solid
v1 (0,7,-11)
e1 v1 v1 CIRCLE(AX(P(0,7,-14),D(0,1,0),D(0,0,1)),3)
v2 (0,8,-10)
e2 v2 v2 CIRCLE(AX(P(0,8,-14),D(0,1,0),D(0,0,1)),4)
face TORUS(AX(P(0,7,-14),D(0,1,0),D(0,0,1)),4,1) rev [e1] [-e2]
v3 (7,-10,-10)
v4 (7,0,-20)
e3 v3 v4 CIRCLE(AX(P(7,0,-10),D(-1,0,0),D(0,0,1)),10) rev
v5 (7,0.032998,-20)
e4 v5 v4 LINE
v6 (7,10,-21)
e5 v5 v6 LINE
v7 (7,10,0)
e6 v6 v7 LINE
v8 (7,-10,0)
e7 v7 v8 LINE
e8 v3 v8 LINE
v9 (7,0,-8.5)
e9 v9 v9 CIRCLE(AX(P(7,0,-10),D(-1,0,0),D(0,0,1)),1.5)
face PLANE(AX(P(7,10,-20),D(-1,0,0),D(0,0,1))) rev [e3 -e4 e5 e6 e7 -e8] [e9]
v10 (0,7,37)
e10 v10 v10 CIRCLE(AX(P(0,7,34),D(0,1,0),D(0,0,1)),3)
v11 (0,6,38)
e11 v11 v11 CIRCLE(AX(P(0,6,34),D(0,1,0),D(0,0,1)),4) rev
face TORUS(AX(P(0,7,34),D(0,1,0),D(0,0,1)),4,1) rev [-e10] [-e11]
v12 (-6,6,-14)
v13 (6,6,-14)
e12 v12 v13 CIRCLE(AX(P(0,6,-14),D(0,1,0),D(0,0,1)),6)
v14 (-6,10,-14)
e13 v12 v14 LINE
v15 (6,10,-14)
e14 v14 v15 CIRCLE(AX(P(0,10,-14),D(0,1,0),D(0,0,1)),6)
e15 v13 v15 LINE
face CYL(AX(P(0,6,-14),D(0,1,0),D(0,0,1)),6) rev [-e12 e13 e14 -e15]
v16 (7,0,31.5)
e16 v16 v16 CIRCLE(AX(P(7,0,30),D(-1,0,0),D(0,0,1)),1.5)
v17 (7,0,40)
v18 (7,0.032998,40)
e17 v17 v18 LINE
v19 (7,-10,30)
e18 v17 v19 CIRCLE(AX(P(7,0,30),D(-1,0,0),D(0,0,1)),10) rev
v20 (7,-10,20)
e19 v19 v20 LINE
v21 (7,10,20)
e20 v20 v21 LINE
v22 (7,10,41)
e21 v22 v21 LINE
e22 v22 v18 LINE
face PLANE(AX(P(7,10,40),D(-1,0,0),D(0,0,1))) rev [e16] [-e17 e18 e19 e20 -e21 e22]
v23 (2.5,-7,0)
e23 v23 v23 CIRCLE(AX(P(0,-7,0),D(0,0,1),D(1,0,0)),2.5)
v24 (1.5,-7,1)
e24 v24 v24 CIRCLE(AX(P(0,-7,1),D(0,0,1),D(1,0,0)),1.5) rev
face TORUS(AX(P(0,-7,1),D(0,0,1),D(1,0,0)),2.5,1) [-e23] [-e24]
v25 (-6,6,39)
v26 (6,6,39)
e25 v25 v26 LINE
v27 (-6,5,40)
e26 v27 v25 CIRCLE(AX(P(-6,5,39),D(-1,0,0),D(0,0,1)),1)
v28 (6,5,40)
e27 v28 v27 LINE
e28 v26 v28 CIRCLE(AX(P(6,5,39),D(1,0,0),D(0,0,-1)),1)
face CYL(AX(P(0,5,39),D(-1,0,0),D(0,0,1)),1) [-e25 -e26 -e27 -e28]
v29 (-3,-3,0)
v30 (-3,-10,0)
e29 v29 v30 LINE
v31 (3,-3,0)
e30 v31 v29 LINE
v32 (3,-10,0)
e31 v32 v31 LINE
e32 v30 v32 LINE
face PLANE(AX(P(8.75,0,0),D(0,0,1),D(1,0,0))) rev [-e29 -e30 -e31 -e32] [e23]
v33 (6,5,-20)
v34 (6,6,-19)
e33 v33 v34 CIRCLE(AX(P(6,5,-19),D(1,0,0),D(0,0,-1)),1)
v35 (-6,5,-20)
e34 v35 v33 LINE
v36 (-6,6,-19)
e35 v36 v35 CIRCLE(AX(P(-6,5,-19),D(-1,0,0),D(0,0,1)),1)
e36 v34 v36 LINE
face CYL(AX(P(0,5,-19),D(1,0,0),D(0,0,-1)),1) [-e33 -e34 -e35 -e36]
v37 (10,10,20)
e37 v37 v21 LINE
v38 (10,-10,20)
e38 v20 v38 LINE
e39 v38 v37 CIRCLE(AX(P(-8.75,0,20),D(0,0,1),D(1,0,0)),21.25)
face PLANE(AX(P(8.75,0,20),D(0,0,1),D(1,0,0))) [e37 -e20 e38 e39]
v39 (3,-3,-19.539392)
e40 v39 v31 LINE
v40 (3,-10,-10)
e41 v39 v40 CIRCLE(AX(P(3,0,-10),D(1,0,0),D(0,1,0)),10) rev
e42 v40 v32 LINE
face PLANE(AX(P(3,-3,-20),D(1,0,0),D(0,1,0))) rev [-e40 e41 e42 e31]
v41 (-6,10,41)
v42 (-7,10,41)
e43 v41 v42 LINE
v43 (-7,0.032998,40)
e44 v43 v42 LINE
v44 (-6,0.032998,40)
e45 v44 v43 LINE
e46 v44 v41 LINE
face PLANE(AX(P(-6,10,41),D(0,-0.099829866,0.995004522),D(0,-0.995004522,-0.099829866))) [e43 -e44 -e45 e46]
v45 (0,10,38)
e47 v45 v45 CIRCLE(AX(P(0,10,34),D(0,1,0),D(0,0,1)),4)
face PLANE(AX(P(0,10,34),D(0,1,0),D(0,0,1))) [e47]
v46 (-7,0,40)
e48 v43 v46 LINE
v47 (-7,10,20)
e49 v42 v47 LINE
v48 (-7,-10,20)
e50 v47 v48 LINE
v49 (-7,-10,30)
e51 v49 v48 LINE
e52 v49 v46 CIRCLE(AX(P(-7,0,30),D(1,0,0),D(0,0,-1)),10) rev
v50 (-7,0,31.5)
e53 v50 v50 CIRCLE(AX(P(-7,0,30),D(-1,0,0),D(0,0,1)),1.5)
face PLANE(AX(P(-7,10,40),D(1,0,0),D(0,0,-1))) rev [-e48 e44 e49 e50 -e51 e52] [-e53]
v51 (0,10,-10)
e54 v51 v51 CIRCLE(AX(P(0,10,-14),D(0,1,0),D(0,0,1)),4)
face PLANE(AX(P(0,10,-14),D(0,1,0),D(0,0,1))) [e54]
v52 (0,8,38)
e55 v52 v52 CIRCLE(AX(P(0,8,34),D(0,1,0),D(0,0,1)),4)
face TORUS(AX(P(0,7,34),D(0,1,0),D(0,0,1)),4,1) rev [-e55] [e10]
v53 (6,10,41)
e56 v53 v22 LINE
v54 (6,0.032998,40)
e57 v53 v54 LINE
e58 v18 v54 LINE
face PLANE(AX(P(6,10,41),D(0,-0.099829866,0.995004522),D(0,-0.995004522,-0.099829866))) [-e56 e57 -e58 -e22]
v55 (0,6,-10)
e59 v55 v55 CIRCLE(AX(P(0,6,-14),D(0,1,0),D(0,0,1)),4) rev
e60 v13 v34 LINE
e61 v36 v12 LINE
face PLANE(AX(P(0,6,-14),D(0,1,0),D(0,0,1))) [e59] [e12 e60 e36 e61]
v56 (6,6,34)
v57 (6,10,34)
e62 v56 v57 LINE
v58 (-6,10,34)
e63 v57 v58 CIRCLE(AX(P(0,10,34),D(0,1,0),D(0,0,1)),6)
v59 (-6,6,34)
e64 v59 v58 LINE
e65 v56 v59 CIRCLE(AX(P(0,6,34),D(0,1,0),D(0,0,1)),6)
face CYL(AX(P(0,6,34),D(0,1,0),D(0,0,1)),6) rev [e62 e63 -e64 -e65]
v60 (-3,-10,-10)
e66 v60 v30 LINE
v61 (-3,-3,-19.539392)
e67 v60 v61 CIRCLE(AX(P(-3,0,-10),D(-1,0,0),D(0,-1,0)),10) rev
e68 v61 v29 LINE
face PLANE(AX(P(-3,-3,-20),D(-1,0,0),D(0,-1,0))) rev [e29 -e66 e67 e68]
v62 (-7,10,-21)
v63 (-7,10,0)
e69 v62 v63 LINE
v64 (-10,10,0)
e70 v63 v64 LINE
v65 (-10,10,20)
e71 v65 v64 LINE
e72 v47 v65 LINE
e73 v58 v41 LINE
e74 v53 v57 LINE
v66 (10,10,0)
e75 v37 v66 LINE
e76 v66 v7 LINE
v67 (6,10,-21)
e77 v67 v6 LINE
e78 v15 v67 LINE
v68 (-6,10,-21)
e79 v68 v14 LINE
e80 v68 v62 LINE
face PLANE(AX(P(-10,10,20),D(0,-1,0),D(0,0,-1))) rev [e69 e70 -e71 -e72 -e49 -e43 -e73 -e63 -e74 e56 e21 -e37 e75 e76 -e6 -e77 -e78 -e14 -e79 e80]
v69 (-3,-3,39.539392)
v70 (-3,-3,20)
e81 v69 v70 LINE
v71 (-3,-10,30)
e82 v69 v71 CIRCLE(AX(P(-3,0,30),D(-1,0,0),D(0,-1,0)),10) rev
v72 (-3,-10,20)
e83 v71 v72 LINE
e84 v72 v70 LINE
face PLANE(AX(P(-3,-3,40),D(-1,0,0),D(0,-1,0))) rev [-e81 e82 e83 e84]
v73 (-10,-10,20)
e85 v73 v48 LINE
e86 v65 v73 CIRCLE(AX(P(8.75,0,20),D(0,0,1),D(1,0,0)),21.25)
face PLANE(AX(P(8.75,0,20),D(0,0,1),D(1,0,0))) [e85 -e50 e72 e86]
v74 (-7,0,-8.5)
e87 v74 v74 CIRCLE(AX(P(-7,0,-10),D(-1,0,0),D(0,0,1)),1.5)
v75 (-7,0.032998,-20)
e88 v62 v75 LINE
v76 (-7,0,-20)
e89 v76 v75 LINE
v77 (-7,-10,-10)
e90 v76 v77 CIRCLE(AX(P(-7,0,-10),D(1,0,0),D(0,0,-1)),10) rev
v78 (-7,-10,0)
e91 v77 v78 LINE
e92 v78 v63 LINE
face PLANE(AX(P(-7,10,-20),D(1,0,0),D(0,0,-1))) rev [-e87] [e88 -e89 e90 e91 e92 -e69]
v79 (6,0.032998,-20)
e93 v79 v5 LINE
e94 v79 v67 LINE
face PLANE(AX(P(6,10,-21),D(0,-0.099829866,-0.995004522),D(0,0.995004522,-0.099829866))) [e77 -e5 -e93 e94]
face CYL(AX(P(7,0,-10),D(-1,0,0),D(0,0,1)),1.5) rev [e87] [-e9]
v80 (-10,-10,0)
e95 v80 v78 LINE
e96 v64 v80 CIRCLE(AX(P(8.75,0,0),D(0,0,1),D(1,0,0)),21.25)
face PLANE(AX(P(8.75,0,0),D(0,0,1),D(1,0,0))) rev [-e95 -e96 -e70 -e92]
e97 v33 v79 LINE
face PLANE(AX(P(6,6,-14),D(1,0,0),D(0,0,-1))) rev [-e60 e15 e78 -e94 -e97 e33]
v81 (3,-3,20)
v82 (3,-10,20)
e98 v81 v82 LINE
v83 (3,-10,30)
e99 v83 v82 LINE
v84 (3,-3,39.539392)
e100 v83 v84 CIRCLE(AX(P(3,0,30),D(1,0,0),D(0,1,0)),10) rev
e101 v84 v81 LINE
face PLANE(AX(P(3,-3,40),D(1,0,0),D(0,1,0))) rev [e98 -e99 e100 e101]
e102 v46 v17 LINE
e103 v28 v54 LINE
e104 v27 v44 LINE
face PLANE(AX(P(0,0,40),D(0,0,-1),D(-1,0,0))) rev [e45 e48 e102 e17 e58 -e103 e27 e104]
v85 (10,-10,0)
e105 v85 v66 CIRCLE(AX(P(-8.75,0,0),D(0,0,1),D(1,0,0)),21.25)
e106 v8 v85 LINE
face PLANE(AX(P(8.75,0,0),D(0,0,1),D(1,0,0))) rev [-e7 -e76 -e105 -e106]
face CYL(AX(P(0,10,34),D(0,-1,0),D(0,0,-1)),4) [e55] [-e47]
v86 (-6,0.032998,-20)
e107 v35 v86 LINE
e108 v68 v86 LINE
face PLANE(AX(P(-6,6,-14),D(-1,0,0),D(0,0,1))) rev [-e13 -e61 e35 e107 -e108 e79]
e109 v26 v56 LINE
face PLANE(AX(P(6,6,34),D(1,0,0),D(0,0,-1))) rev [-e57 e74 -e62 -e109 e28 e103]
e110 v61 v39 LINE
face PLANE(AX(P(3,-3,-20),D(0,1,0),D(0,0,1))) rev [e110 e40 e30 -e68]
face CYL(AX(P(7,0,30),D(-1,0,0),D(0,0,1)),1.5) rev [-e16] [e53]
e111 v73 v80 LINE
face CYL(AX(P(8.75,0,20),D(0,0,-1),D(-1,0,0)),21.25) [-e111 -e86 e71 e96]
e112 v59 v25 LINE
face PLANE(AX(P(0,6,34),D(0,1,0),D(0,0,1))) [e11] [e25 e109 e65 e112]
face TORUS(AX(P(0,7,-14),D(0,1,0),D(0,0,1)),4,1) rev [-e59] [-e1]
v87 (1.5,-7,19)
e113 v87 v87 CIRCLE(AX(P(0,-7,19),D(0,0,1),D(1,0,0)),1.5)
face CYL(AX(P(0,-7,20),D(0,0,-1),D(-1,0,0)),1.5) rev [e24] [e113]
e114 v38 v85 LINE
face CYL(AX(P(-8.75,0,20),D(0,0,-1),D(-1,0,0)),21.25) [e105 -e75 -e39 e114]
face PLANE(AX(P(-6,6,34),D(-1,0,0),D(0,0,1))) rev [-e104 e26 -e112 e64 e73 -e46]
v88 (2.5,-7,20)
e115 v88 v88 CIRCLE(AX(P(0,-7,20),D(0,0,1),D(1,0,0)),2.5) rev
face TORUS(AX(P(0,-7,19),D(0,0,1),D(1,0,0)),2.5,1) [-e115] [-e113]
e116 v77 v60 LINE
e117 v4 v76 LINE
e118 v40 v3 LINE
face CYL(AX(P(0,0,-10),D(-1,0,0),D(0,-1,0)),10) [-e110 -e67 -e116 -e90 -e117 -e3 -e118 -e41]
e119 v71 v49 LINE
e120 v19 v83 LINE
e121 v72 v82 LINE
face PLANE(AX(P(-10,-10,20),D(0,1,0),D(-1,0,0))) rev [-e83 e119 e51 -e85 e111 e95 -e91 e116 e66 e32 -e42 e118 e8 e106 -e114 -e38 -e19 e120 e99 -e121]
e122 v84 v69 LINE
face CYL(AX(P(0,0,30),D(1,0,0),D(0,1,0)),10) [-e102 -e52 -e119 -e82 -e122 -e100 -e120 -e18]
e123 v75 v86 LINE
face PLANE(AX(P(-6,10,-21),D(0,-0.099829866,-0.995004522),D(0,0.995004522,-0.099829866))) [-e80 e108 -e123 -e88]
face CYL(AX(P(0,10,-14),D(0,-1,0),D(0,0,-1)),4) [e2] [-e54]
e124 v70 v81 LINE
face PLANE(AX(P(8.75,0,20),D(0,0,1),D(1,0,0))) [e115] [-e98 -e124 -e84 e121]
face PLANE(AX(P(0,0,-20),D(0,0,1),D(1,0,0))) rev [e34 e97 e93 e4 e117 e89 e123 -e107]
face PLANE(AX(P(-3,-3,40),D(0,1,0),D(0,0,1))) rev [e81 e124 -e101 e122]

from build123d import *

# Parameters (mm, degrees)
SALIENTE_EXTRUIR1_DEPTH = 20
CROQUIS5_R              = 1.5
CORTAR_EXTRUIR3_DEPTH   = 20
SALIENTE_EXTRUIR2_DEPTH = 20
SALIENTE_EXTRUIR3_DEPTH = 20
CROQUIS4_R              = 1.5
CORTAR_EXTRUIR2_DEPTH   = 14
REDONDEO1_R             = 10
CUT_EXTRUDE1_DEPTH      = 4
SKETCH2_R               = 3
BOSS_EXTRUDE1_DEPTH     = 2
SKETCH3_R               = 4
BOSS_EXTRUDE2_DEPTH     = 2
FILLET1_R               = 1
FILLET2_R               = 1
FILLET3_R               = 1
BOSS_EXTRUDE3_DEPTH     = 1
BOSS_EXTRUDE4_DEPTH     = 1


with BuildPart() as part:
    # Croquis1 → Saliente-Extruir1 (new body)
    with BuildSketch(Plane.XY):
        with BuildLine():
            Line((-10, 10), (10, 10))
            ThreePointArc((10, 10), (12.5, 0), (10, -10))
            Line((10, -10), (-10, -10))
            ThreePointArc((-10, -10), (-12.5, 0), (-10, 10))
        make_face()
    extrude(amount=SALIENTE_EXTRUIR1_DEPTH)

    # Croquis5 → Cortar-Extruir3 (cut)
    with BuildSketch(Plane(origin=(0, 0, 0), x_dir=(-1, 0, 0), z_dir=(0, 0, -1))):
        with Locations((0, -7)):
            Circle(CROQUIS5_R)
    extrude(amount=-CORTAR_EXTRUIR3_DEPTH, mode=Mode.SUBTRACT)

    # Croquis2 → Saliente-Extruir2 (add)
    with BuildSketch(Plane(origin=(0, 0, 0), x_dir=(-1, 0, 0), z_dir=(0, 0, -1))):
        Polygon((-7, 10), (-7, -10), (-3, -10), (-3, -3), (3, -3), (3, -10), (7, -10), (7, 10), align=None)
    extrude(amount=SALIENTE_EXTRUIR2_DEPTH)

    # Croquis3 → Saliente-Extruir3 (add)
    with BuildSketch(Plane.XY.offset(20)):
        Polygon((-7, 10), (-7, -10), (-3, -10), (-3, -3), (3, -3), (3, -10), (7, -10), (7, 10), align=None)
    extrude(amount=SALIENTE_EXTRUIR3_DEPTH)

    # Croquis4 → Cortar-Extruir2 (cut)
    with BuildSketch(Plane.ZY.offset(7)):
        with Locations((-10, 0)):
            Circle(CROQUIS4_R)
        with Locations((30, 0)):
            Circle(CROQUIS4_R)
    extrude(amount=-CORTAR_EXTRUIR2_DEPTH, mode=Mode.SUBTRACT)

    # Redondeo1
    redondeo1_edges = [part.edges().sort_by_distance(p)[0] for p in [
        (-5, -10, 40),
        (-5, -10, -20),
    ]]
    fillet(redondeo1_edges, radius=REDONDEO1_R)

    # Sketch1 → Cut-Extrude1 (cut)
    with BuildSketch(Plane(origin=(0, 10, 0), x_dir=(1, 0, 0), z_dir=(0, 1, 0))):
        with BuildLine():
            Line((-6, 14), (-6, 20))
            Line((-6, 20), (6, 20))
            Line((6, 20), (6, 14))
            ThreePointArc((6, 14), (0, 8), (-6, 14))
        make_face()
        with BuildLine():
            Line((-6, -34), (-6, -40))
            Line((-6, -40), (6, -40))
            Line((6, -40), (6, -34))
            ThreePointArc((6, -34), (0, -28), (-6, -34))
        make_face()
    extrude(amount=-CUT_EXTRUDE1_DEPTH, mode=Mode.SUBTRACT)

    # Sketch2 → Boss-Extrude1 (add)
    with BuildSketch(Plane(origin=(0, 6, 0), x_dir=(1, 0, 0), z_dir=(0, 1, 0))):
        with Locations(Location((0, -34, 0), (0, 0, 270))):
            Circle(SKETCH2_R)
        with Locations(Location((0, 14, 0), (0, 0, 270))):
            Circle(SKETCH2_R)
    extrude(amount=BOSS_EXTRUDE1_DEPTH)

    # Sketch3 → Boss-Extrude2 (add)
    with BuildSketch(Plane(origin=(0, 8, 0), x_dir=(1, 0, 0), z_dir=(0, 1, 0))):
        with Locations(Location((0, -34, 0), (0, 0, 270))):
            Circle(SKETCH3_R)
        with Locations(Location((0, 14, 0), (0, 0, 270))):
            Circle(SKETCH3_R)
    extrude(amount=BOSS_EXTRUDE2_DEPTH)

    # Fillet1
    fillet1_edges = [part.edges().sort_by_distance(p)[0] for p in [
        (0, 6, 31),
        (0, 8, 31),
        (0, 6, -17),
        (0, 8, -17),
    ]]
    fillet(fillet1_edges, radius=FILLET1_R - 0.0001)  # a hair under: the kernel refuses the full size

    # Fillet2
    fillet2_edges = [part.edges().sort_by_distance(p)[0] for p in [
        (0, 6, 40),
        (0, 6, -20),
    ]]
    fillet(fillet2_edges, radius=FILLET2_R)

    # Fillet3
    fillet3_edges = [part.edges().sort_by_distance(p)[0] for p in [
        (1.5, -7, 20),
        (1.5, -7, 0),
    ]]
    fillet(fillet3_edges, radius=FILLET3_R)

    # Sketch5 → Boss-Extrude3 (add)
    with BuildSketch(Plane(origin=(7, 0, 0), x_dir=(0, 0, -1), z_dir=(1, 0, 0))):
        Polygon((20, 10), (21, 10), (19.794177314, -2.018437696), align=None)
        Polygon((-40, 10), (-41, 10), (-39.794177314, -2.018437696), align=None)
    extrude(amount=-BOSS_EXTRUDE3_DEPTH)

    # Sketch6 → Boss-Extrude4 (add)
    with BuildSketch(Plane.ZY.offset(7)):
        Polygon((-20, 10), (-21, 10), (-19.794177314, -2.018437696), align=None)
        Polygon((40, 10), (41, 10), (39.794177314, -2.018437696), align=None)
    extrude(amount=-BOSS_EXTRUDE4_DEPTH)


solid = part.part
